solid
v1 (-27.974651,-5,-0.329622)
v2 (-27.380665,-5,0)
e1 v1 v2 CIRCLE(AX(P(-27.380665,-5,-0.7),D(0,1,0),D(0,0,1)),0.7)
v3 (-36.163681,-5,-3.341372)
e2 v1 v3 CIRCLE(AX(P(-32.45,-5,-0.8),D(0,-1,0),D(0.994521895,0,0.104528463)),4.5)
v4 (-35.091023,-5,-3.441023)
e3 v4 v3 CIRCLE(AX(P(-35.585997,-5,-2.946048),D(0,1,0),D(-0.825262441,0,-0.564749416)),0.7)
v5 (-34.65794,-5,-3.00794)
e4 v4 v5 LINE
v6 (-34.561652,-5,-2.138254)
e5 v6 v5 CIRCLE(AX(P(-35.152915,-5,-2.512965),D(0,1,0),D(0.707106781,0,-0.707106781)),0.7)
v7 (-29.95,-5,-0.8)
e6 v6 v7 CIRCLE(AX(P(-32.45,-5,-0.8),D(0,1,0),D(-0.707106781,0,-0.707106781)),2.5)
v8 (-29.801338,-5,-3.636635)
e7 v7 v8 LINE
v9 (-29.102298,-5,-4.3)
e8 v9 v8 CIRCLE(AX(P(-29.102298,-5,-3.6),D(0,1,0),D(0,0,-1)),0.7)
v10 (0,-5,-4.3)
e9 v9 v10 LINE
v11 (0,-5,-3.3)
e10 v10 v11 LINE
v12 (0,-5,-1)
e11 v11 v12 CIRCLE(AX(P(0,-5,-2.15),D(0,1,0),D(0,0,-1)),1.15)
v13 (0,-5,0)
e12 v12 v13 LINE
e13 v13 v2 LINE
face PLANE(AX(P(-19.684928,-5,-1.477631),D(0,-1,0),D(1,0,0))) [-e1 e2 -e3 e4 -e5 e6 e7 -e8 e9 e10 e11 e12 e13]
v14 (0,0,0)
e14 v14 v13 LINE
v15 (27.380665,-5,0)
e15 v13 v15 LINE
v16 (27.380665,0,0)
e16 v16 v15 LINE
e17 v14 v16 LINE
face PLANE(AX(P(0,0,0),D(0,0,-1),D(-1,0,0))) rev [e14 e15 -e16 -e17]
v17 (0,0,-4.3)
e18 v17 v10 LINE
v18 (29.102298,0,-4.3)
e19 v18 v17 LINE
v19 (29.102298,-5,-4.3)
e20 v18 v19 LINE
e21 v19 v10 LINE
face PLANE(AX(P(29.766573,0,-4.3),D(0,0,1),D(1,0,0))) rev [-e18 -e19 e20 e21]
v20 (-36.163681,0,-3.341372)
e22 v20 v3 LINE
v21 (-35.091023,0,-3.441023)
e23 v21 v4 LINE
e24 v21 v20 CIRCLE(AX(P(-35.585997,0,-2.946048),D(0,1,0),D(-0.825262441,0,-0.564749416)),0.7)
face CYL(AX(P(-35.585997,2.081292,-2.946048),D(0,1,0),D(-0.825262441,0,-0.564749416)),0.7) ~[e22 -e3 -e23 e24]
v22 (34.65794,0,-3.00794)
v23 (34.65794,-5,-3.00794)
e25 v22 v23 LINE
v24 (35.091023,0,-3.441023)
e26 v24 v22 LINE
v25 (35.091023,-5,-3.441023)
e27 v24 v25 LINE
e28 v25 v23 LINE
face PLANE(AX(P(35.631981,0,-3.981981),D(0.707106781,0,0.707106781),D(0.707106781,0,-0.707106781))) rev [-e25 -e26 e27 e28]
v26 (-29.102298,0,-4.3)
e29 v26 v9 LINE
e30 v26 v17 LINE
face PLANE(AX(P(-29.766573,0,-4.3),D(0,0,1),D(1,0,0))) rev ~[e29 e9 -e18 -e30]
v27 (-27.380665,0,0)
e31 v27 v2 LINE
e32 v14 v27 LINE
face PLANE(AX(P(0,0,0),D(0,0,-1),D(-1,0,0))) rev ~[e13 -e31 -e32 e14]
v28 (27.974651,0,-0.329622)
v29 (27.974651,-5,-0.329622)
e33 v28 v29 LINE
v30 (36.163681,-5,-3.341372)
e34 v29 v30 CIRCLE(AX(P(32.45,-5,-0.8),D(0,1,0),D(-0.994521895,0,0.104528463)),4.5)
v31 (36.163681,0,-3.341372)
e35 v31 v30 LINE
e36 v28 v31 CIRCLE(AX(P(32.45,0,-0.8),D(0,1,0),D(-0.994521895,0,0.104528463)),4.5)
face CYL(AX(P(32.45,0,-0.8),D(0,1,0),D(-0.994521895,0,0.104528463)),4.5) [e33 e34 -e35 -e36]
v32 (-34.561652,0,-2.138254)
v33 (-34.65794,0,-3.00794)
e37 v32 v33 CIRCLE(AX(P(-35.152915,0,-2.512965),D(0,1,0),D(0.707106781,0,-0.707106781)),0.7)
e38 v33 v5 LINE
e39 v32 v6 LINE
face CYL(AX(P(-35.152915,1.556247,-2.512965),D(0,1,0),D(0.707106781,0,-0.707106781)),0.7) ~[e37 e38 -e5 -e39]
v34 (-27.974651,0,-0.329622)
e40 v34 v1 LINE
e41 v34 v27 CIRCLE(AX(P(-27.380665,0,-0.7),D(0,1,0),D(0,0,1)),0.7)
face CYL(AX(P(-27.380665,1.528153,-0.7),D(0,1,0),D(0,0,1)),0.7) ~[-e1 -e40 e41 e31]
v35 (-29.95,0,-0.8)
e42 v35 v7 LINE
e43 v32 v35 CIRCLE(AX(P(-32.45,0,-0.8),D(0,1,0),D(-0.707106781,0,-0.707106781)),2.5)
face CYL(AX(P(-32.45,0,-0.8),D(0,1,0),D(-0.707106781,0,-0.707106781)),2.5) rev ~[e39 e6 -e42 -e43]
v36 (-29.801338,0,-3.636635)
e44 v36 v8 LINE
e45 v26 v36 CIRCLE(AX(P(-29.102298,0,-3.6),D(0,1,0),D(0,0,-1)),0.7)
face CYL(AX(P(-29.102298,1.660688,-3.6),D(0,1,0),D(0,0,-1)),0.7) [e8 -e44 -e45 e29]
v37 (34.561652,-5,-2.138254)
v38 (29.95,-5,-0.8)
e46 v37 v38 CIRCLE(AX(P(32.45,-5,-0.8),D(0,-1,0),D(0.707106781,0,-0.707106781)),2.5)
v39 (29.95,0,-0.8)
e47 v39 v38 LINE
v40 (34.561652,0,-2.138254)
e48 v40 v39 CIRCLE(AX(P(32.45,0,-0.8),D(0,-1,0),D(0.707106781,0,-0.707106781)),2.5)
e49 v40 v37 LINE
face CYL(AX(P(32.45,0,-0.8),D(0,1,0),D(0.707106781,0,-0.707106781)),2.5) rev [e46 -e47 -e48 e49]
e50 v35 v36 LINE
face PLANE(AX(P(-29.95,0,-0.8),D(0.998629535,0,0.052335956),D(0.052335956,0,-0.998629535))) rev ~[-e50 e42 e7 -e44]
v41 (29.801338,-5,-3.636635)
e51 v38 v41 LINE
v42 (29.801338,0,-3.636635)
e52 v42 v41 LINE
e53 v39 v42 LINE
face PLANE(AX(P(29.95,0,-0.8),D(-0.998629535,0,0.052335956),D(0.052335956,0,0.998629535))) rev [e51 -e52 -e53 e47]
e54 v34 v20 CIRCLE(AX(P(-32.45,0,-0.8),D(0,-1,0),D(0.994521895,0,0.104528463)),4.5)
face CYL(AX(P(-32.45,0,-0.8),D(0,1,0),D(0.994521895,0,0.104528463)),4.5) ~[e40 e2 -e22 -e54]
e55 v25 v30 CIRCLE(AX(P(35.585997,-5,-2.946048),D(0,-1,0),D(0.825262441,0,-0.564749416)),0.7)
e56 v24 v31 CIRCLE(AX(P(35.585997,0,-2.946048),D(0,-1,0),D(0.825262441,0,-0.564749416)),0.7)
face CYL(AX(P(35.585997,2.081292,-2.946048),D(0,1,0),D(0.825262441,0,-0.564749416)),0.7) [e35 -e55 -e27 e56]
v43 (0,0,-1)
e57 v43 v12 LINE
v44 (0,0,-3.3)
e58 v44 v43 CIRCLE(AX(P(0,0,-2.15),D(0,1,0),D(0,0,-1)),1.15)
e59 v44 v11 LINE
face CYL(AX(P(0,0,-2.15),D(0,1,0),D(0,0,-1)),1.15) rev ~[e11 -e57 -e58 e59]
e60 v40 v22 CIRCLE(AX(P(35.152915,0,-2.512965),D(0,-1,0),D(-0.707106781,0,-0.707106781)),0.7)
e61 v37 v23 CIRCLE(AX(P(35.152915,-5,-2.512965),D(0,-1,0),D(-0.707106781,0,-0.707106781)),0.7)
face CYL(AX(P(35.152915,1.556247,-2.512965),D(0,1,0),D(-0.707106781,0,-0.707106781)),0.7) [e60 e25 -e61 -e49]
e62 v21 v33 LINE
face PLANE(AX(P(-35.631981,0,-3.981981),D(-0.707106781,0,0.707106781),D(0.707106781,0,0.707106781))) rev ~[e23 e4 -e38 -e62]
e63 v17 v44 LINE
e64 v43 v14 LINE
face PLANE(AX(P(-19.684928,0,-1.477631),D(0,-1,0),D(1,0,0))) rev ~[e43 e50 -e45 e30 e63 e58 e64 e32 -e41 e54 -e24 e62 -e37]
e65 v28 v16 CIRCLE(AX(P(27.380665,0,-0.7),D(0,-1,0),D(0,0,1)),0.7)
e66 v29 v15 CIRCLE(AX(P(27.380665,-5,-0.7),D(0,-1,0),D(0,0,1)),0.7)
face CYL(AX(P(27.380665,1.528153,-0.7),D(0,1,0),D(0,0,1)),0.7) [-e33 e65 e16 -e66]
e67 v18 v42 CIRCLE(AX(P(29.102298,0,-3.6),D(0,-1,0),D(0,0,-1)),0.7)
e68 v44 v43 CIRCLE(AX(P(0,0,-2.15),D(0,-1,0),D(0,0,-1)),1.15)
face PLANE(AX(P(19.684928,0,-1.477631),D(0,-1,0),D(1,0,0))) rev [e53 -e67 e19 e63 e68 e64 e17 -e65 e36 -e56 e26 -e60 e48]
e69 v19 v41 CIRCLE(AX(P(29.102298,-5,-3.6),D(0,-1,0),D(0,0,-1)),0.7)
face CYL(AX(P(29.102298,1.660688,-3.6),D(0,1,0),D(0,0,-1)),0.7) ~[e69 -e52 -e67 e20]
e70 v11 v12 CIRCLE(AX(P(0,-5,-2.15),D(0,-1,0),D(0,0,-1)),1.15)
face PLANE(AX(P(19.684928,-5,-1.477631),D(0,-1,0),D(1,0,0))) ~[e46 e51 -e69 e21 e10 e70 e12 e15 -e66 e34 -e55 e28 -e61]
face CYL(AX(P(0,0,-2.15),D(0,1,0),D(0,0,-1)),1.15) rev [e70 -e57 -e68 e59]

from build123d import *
from build123d import SkipClean  # not in build123d's __all__

# Parameters (mm, degrees)
F1_DEPTH    = 5
F2_T1_DEPTH = 8.0563067351
F2_T3_DEPTH = 8.3213759835
F2_T5_DEPTH = 8.112494996
F2_T7_DEPTH = 9.1625838734


# Not quite as in the source:
# - a fillet or chamfer that OpenCascade refuses, or shapes differently, is made with other operations: its cross-section is extruded or revolved along the edge and cut away or added


with BuildPart() as f1:
    # F0 (on Front) → F1 (new body)
    with BuildSketch(Plane.XZ):
        with BuildLine():
            Line((0, -1), (0, 0))
            Line((0, 0), (-27.9919262234, 0))
            Line((-27.9919262234, 0), (-27.9746514708, -0.3296219153))
            ThreePointArc((-27.9746514708, -0.3296219153), (-34.3872999356, 3.2616337796), (-35.6319805153, -3.9819805153))
            Line((-35.6319805153, -3.9819805153), (-34.217766953, -2.567766953))
            ThreePointArc((-34.217766953, -2.567766953), (-33.4067085809, 1.5096988313), (-29.95, -0.8))
            Line((-29.95, -0.8), (-29.7665727725, -4.3))
            Line((-29.7665727725, -4.3), (0, -4.3))
            Line((0, -4.3), (0, -3.3))
            ThreePointArc((0, -3.3), (-1.15, -2.15), (0, -1))
        make_face()
        with BuildLine():
            Line((-27.95, -0.8), (-27.9746514708, -0.3296219153))
            ThreePointArc((-27.9746514708, -0.3296219153), (-27.9561670936, -0.5644881969), (-27.95, -0.8))
        make_face(mode=Mode.SUBTRACT)
        with BuildLine():
            ThreePointArc((-27.95, -0.8), (-27.9561670936, -0.5644881969), (-27.9746514708, -0.3296219153))
            Line((-27.9746514708, -0.3296219153), (-27.95, -0.8))
        make_face()
    extrude(amount=F1_DEPTH)

    # F2: fillet of radius 0.7 on 4 edges, made by hand

    # F2_s2 → F2_t1 (cut)
    with BuildSketch(Plane.XZ.offset(-1.5281533676)):
        with BuildLine():
            ThreePointArc((-27.3806648764, 0), (-27.7203230433, -0.0879278395), (-27.9746514708, -0.3296219153))
            Line((-27.9746514708, -0.3296219153), (-27.9919262234, 0))
            Line((-27.9919262234, 0), (-27.3806648764, 0))
        make_face()
    extrude(amount=F2_T1_DEPTH, mode=Mode.SUBTRACT)

    # F2_s4 → F2_t3 (cut)
    with BuildSketch(Plane.XZ.offset(-1.6606879918)):
        with BuildLine():
            ThreePointArc((-29.1022975758, -4.3), (-29.5841457788, -4.1077620597), (-29.8013382501, -3.6366351694))
            Line((-29.8013382501, -3.6366351694), (-29.7665727725, -4.3))
            Line((-29.7665727725, -4.3), (-29.1022975758, -4.3))
        make_face()
    extrude(amount=F2_T3_DEPTH, mode=Mode.SUBTRACT)

    # F2_s6 → F2_t5 (cut)
    with BuildSketch(Plane.XZ.offset(-1.556247498)):
        with BuildLine():
            ThreePointArc((-34.6579402166, -3.0079402166), (-34.4571662087, -2.5899957909), (-34.5616523152, -2.1382542732))
            ThreePointArc((-34.5616523152, -2.1382542732), (-34.4015618745, -2.3625), (-34.217766953, -2.567766953))
            Line((-34.217766953, -2.567766953), (-34.6579402166, -3.0079402166))
        make_face()
    extrude(amount=F2_T5_DEPTH, mode=Mode.SUBTRACT)

    # F2_s8 → F2_t7 (cut)
    with BuildSketch(Plane.XZ.offset(-2.0812919367)):
        with BuildLine():
            ThreePointArc((-36.1636809848, -3.3413723739), (-35.6507485808, -3.6430465403), (-35.0910225292, -3.4410225292))
            Line((-35.0910225292, -3.4410225292), (-35.6319805153, -3.9819805153))
            ThreePointArc((-35.6319805153, -3.9819805153), (-35.9126769383, -3.6739986815), (-36.1636809848, -3.3413723739))
        make_face()
    extrude(amount=F2_T7_DEPTH, mode=Mode.SUBTRACT)

    # F3: F1 across plane


with BuildPart() as f1_1:
    add(f1.part, clean=False)
    with SkipClean():  # cleaning this boolean's faces spoils the solid; the shape is the same uncleaned
        add(f1.part.mirror(Plane.YZ), clean=False)


solid = f1_1.part
